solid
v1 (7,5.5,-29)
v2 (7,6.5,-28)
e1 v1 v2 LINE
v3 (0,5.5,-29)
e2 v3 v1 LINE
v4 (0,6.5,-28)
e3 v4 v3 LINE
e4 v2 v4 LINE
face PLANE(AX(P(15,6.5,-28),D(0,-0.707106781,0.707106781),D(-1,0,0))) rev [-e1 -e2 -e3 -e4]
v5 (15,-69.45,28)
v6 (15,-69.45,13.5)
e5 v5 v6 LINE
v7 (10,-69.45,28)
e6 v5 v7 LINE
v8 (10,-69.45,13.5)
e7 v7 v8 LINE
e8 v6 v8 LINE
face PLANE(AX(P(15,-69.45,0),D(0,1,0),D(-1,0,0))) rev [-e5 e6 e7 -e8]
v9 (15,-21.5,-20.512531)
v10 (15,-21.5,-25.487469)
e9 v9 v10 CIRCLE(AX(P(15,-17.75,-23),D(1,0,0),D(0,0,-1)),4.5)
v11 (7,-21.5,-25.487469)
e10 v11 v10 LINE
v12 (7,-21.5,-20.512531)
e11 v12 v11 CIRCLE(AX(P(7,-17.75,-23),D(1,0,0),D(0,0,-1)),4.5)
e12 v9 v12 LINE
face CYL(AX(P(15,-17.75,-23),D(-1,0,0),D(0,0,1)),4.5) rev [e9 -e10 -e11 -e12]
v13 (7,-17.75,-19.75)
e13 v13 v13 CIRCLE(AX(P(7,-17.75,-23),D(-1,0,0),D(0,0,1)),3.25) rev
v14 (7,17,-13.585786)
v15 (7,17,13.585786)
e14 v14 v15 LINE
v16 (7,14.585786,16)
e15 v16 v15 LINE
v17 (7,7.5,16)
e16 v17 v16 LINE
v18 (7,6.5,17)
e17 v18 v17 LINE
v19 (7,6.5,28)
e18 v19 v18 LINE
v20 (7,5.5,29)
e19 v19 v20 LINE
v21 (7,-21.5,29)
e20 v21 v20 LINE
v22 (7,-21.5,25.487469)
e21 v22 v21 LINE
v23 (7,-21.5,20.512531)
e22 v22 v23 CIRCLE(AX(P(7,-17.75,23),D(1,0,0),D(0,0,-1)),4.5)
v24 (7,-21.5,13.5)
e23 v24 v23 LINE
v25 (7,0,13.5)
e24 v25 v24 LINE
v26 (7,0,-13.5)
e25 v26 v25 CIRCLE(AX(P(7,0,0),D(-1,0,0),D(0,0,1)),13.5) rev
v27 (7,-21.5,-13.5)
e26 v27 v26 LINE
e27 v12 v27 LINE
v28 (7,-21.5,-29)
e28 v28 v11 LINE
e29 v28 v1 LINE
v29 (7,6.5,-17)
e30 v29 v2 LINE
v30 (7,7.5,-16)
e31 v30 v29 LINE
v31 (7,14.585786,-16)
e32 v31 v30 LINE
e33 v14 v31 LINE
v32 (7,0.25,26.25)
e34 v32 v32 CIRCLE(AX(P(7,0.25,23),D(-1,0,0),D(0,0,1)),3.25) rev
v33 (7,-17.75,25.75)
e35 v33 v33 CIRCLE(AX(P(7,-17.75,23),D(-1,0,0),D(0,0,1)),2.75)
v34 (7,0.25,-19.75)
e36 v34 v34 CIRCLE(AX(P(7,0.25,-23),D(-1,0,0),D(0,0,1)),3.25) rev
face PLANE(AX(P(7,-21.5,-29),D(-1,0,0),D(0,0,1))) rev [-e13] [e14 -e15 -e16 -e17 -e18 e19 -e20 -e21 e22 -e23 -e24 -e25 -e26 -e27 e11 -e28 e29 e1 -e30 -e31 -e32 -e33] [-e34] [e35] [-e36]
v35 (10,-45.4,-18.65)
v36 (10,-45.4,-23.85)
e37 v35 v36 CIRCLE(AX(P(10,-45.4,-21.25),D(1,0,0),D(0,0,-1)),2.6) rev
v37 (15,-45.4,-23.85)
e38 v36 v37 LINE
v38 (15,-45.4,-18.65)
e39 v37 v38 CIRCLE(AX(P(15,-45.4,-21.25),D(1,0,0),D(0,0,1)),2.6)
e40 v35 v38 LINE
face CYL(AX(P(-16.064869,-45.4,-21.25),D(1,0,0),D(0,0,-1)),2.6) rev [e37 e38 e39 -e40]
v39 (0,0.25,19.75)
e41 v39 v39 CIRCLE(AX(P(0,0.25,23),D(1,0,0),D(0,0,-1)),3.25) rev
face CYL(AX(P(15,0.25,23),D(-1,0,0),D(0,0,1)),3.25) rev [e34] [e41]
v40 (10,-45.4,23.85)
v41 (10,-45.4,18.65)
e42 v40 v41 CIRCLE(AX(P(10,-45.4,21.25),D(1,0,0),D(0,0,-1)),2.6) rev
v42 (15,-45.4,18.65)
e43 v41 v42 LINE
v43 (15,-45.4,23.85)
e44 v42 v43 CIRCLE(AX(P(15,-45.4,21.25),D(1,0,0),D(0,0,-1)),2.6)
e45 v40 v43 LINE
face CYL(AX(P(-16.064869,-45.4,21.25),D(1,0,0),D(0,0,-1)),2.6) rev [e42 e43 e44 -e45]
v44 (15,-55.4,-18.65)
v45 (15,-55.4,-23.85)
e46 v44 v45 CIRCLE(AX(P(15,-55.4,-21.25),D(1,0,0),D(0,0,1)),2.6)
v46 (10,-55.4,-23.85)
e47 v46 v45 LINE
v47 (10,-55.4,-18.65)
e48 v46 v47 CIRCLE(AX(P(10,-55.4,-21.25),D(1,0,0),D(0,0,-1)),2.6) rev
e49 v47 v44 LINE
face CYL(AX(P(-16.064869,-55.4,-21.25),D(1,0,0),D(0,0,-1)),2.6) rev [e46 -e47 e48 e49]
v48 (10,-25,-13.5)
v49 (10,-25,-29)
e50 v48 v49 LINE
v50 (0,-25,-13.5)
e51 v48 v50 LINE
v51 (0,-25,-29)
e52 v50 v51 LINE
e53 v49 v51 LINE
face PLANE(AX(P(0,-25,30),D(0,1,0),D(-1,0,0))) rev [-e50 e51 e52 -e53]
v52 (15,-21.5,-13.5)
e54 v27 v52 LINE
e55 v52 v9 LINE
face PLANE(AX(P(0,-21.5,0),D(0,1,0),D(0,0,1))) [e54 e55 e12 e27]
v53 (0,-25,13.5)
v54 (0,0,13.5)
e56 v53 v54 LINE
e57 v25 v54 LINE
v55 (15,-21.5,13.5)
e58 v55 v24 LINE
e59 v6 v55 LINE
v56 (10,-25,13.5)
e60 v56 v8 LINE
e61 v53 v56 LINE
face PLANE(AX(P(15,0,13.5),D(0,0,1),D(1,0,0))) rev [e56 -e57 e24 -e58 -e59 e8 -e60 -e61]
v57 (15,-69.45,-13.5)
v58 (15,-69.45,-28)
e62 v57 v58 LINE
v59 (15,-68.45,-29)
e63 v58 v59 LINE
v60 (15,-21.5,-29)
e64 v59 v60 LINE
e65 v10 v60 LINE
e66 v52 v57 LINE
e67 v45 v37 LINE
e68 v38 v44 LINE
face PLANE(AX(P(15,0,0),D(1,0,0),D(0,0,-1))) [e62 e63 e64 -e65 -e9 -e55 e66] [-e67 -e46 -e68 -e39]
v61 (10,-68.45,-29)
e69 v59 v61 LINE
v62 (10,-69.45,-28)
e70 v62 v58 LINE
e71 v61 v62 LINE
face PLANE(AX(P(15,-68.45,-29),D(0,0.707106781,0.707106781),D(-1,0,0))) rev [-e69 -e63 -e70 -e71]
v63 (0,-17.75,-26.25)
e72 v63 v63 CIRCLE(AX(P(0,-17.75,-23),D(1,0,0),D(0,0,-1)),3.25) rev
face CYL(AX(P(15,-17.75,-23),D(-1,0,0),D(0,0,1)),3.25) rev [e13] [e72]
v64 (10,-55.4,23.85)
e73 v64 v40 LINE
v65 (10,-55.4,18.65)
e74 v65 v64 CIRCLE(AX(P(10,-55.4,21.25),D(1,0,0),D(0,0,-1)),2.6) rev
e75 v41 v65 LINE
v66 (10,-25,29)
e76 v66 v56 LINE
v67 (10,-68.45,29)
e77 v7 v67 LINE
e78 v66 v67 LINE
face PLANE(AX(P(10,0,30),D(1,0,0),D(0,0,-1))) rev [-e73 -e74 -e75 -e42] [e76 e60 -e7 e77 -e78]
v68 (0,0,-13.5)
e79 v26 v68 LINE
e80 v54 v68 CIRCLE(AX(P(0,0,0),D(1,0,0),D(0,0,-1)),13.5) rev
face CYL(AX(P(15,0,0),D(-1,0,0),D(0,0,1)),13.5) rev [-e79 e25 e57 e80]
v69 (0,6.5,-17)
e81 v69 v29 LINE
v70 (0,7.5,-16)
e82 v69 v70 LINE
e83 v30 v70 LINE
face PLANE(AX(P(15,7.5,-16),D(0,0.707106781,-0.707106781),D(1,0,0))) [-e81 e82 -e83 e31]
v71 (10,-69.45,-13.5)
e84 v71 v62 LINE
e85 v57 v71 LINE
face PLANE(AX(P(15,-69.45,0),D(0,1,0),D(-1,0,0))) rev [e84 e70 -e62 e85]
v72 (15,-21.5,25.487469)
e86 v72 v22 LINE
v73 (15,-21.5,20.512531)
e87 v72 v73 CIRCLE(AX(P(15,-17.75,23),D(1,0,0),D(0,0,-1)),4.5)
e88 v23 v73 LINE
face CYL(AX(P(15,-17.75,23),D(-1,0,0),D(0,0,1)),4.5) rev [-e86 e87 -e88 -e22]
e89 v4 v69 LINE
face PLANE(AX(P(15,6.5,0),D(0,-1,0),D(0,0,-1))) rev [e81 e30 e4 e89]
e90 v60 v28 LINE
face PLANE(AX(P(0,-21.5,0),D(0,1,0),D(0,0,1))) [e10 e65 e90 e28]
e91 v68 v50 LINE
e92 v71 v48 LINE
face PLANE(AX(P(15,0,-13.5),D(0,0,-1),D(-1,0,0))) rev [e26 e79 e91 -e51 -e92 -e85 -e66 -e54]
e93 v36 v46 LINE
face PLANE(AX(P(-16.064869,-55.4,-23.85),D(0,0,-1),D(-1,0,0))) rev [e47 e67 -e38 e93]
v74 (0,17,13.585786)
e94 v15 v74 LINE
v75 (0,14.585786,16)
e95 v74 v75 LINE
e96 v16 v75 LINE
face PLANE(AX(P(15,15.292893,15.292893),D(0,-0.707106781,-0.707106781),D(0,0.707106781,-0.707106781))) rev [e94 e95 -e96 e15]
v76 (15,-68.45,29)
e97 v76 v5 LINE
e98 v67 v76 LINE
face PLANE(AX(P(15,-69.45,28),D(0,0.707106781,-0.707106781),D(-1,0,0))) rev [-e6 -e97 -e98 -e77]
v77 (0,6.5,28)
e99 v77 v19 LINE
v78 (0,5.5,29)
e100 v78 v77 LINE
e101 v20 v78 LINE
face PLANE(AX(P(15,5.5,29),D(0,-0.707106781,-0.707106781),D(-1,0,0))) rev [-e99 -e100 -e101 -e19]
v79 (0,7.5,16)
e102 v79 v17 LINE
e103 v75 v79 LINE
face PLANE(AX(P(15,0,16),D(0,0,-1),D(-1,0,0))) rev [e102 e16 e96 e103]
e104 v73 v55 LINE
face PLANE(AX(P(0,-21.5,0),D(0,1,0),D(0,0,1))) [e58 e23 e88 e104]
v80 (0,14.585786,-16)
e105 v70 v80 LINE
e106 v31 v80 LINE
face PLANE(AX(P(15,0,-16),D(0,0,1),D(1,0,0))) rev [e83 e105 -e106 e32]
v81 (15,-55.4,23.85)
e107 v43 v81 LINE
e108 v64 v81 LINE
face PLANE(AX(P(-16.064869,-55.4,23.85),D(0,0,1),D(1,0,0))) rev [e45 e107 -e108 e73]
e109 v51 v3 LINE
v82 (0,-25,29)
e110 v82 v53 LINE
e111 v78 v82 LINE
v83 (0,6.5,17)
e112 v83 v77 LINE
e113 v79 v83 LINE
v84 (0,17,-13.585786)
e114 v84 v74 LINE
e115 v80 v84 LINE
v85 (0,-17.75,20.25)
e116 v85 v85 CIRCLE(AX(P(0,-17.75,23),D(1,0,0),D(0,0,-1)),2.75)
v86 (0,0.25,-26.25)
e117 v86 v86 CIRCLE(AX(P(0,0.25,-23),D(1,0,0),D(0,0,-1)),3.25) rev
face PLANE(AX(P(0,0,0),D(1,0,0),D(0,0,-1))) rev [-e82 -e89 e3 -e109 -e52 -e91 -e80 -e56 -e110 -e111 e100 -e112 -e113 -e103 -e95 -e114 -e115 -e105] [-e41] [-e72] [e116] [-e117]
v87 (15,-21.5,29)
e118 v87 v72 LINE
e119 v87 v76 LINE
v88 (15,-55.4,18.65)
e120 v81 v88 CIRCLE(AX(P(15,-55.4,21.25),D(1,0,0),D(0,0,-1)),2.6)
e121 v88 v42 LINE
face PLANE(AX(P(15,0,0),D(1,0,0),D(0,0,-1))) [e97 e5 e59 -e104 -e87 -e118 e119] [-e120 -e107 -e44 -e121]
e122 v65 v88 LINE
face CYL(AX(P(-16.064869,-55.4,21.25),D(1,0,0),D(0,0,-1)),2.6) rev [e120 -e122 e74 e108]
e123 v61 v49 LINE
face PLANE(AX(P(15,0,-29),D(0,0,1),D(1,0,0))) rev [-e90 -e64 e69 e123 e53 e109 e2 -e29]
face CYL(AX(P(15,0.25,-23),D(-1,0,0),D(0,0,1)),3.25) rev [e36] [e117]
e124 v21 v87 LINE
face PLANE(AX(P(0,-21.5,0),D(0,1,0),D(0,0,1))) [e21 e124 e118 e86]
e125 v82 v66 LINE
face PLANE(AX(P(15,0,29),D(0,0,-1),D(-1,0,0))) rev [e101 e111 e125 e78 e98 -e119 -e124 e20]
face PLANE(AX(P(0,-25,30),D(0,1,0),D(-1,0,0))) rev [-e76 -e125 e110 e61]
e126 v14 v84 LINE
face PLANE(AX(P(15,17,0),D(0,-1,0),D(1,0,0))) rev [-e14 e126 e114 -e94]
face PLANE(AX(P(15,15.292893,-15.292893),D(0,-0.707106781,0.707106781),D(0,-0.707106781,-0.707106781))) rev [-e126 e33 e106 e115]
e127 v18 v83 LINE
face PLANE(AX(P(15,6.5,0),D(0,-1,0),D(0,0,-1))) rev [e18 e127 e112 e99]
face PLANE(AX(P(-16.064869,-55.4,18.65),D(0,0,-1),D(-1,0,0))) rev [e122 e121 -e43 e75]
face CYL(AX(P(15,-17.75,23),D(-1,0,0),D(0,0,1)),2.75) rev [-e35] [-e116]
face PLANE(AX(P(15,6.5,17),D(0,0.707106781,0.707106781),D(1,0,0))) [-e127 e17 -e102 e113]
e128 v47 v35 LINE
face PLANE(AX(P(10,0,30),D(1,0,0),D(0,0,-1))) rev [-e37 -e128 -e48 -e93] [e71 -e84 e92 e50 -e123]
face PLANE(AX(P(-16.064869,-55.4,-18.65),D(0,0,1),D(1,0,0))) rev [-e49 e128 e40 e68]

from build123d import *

# Parameters (mm, degrees)
SKETCH1_W                               = 43
SKETCH1_H                               = 60
BOSS_EXTRUDE1_DEPTH                     = 20
SKETCH2_W                               = 13
SKETCH2_H                               = 10.5
CUT_EXTRUDE1_DEPTH                      = 44.874821937
SKETCH3_W                               = 13
SKETCH3_H                               = 10.5
CUT_EXTRUDE2_DEPTH                      = 44.874821937
F_5_5_5_5_DIAMETER_HOLE1_D              = 5.5
M22_CLEARANCE_HOLE1_D                   = 26
F_5_5_5_5_DIAMETER_HOLE2_D              = 5.5
F_5_5_5_5_DIAMETER_HOLE2_DEPTH          = 30
CBORE_FOR_M5_HEX_HEAD_BOLT1_D           = 5.5
CBORE_FOR_M5_HEX_HEAD_BOLT1_DEPTH       = 39.75
CBORE_FOR_M5_HEX_HEAD_BOLT1_CBORE_D     = 10.8
CBORE_FOR_M5_HEX_HEAD_BOLT1_CBORE_DEPTH = 3
CHAMFER1_SIZE                           = 3
CHAMFER2_SIZE                           = 0.5
CHAMFER3_SIZE                           = 1
BOSS_EXTRUDE2_OUTLINE_R                 = 2.75
BOSS_EXTRUDE2_OUTLINE_R_2               = 3.25
BOSS_EXTRUDE2_OUTLINE_R_3               = 13.5
BOSS_EXTRUDE2_DEPTH                     = 15
CUT_EXTRUDE4_DEPTH                      = 15
CHAMFER4_SIZE                           = 1
CUT_EXTRUDE5_DEPTH                      = 94.296851501
CUT_EXTRUDE5_DEPTH_BACK                 = 94.296851501
SKETCH17_W                              = 10
SKETCH17_H                              = 43.45
SKETCH17_H_2                            = 1
CUT_EXTRUDE6_DEPTH                      = 77.741791092
SKETCH20_R                              = 13.5
SKETCH20_W                              = 27
SKETCH20_H                              = 44.45
CUT_EXTRUDE7_DEPTH                      = 77.741791092
SKETCH22_W                              = 8
SKETCH22_H                              = 58
CUT_EXTRUDE8_DEPTH                      = 38.5
SKETCH23_R                              = 4.5
CUT_EXTRUDE9_DEPTH                      = 76.68555014


# Read off the part's stored shape, not the designer's step: Boss-Extrude2
with BuildPart() as part:
    # Sketch1 → Boss-Extrude1 (new body)
    with BuildSketch(Plane(origin=(-20, 0, 0), x_dir=(0, -1, 0), z_dir=(-1, 0, 0))):
        with Locations((3.5, 0)):
            Rectangle(SKETCH1_W, SKETCH1_H)
    extrude(amount=-BOSS_EXTRUDE1_DEPTH)

    # Sketch2 → Cut-Extrude1 (cut, through all)
    with BuildSketch(Plane(origin=(0, 0, 0), x_dir=(0, 0, -1), z_dir=(1, 0, 0))):
        with Locations((-23.5, 12.75)):
            Rectangle(SKETCH2_W, SKETCH2_H)
    extrude(amount=-CUT_EXTRUDE1_DEPTH, mode=Mode.SUBTRACT)

    # Sketch3 → Cut-Extrude2 (cut, through all)
    with BuildSketch(Plane(origin=(0, 0, 0), x_dir=(0, 0, -1), z_dir=(1, 0, 0))):
        with Locations((23.5, 12.75)):
            Rectangle(SKETCH3_W, SKETCH3_H)
    extrude(amount=-CUT_EXTRUDE2_DEPTH, mode=Mode.SUBTRACT)

    # Ø5.5 (5.5) Diameter Hole1 (through all)
    with Locations(Plane.ZY.offset(20)):
        with Locations((23, 0.25), (-23, -17.75), (-23, 0.25)):
            Hole(F_5_5_5_5_DIAMETER_HOLE1_D / 2)

    # M22 Clearance Hole1 (through all)
    with Locations(Plane(origin=(0, 0, 0), x_dir=(0, 0, -1), z_dir=(1, 0, 0))):
        with Locations((0, 0)):
            Hole(M22_CLEARANCE_HOLE1_D / 2)

    # Ø5.5 (5.5) Diameter Hole2
    with Locations(Plane(origin=(0, 0, 0), x_dir=(0, 0, -1), z_dir=(1, 0, 0))):
        with Locations((-23, -17.75)):
            Hole(F_5_5_5_5_DIAMETER_HOLE2_D / 2, depth=F_5_5_5_5_DIAMETER_HOLE2_DEPTH)

    # CBORE for M5 Hex Head Bolt1
    with Locations(Plane(origin=(0, 7.5, 0), x_dir=(1, 0, 0), z_dir=(0, 1, 0))):
        with Locations((-10, 23), (-10, -23)):
            CounterBoreHole(CBORE_FOR_M5_HEX_HEAD_BOLT1_D / 2, CBORE_FOR_M5_HEX_HEAD_BOLT1_CBORE_D / 2, CBORE_FOR_M5_HEX_HEAD_BOLT1_CBORE_DEPTH, depth=CBORE_FOR_M5_HEX_HEAD_BOLT1_DEPTH)

    # Chamfer1
    chamfer1_edges = [part.edges().sort_by_distance(p)[0] for p in [
        (-10, 18, 17),
        (-10, 18, -17),
    ]]
    chamfer(chamfer1_edges, length=CHAMFER1_SIZE)

    # Chamfer2
    chamfer2_edges = [part.edges().sort_by_distance(p)[0] for p in [
        (-7.25, -25, -23),
        (-20, 0.25, -20.25),
        (0, 0.25, -20.25),
        (-20, -17.75, -20.25),
        (0, -17.75, -20.25),
        (-20, 0.25, 25.75),
        (0, 0.25, 25.75),
        (0, 0, -13),
        (-20, 0, -13),
        (-20, -17.75, 20.25),
        (0, -17.75, 20.25),
        (-7.25, -25, 23),
    ]]
    chamfer(chamfer2_edges, length=CHAMFER2_SIZE)

    # Chamfer3
    chamfer3_edges = [part.edges().sort_by_distance(p)[0] for p in [
        (0, 11.25, -17),
        (-20, 11.25, -17),
        (0, 18, 0),
        (0, 16.5, 15.5),
        (0, 16.5, -15.5),
        (-20, 18, 0),
        (-20, 16.5, 15.5),
        (-20, 16.5, -15.5),
        (-10, 7.5, 30),
        (-20, 11.25, 17),
        (-20, 7.5, 23.5),
        (0, 7.5, 23.5),
        (0, 11.25, 17),
        (-20, -8.75, -30),
        (0, -8.75, -30),
        (-20, 7.5, -23.5),
        (-10, 7.5, -30),
        (0, 7.5, -23.5),
        (0, -25, 0),
        (-20, -8.75, 30),
        (-20, -25, 0),
        (-10, -25, -30),
        (-10, -25, 30),
        (0, -8.75, 30),
    ]]
    chamfer(chamfer3_edges, length=CHAMFER3_SIZE)

    # Boss-Extrude2 outline → Boss-Extrude2 (add)
    with BuildSketch(Plane(origin=(0, 0, 0), x_dir=(0, 0, -1), z_dir=(1, 0, 0))):
        Polygon((-29, 6.5), (-29, -69.45), (29, -69.45), (29, 6.5), (16, 6.5), (16, 14.585786438), (13.585786438, 17), (-13.585786438, 17), (-16, 14.585786438), (-16, 6.5), align=None)
        with Locations((-23, -17.75)):
            Circle(BOSS_EXTRUDE2_OUTLINE_R, mode=Mode.SUBTRACT)
        with Locations((-23, 0.25)):
            Circle(BOSS_EXTRUDE2_OUTLINE_R_2, mode=Mode.SUBTRACT)
        with Locations((23, -17.75)):
            Circle(BOSS_EXTRUDE2_OUTLINE_R_2, mode=Mode.SUBTRACT)
        Circle(BOSS_EXTRUDE2_OUTLINE_R_3, mode=Mode.SUBTRACT)
        with Locations((23, 0.25)):
            Circle(BOSS_EXTRUDE2_OUTLINE_R_2, mode=Mode.SUBTRACT)
    extrude(amount=BOSS_EXTRUDE2_DEPTH)

    # Sketch16 → Cut-Extrude4 (cut)
    with BuildSketch(Plane(origin=(15, 0, 0), x_dir=(0, 0, -1), z_dir=(1, 0, 0))):
        with BuildLine():
            Line((-23.85, -55.4), (-23.85, -45.4))
            ThreePointArc((-23.85, -45.4), (-21.25, -42.8), (-18.65, -45.4))
            Line((-18.65, -45.4), (-18.65, -55.4))
            ThreePointArc((-18.65, -55.4), (-21.25, -58), (-23.85, -55.4))
        make_face()
        with BuildLine():
            Line((23.85, -55.4), (23.85, -45.4))
            ThreePointArc((23.85, -45.4), (21.25, -42.8), (18.65, -45.4))
            Line((18.65, -45.4), (18.65, -55.4))
            ThreePointArc((18.65, -55.4), (21.25, -58), (23.85, -55.4))
        make_face()
    extrude(amount=-CUT_EXTRUDE4_DEPTH, mode=Mode.SUBTRACT)

    # Chamfer4
    # the kernel refuses this chamfer: 1 mm, written as the material it adds along each edge
    with BuildSketch(Plane(origin=(-2.571682988, 6.5, -16), x_dir=(0, 0.9996219169112968, 0.027495876610585623), z_dir=(1, 0, 0))) as chamfer4_piece_1:
        Polygon((CHAMFER4_SIZE * 0.999621916911, -CHAMFER4_SIZE * 0.0274958766106), (-CHAMFER4_SIZE * 0.0274958766106, -CHAMFER4_SIZE * 0.999621916911), (0, 0), align=None)
    extrude(amount=17.571682988)
    with BuildSketch(Plane(origin=(-2.571682988, 6.5, 16), x_dir=(0, 0.9996219169112968, -0.027495876610585623), z_dir=(1, 0, 0))) as chamfer4_piece_2:
        Polygon((CHAMFER4_SIZE * 0.999621916911, CHAMFER4_SIZE * 0.0274958766106), (-CHAMFER4_SIZE * 0.0274958766106, CHAMFER4_SIZE * 0.999621916911), (0, 0), align=None)
    extrude(amount=17.571682988)
    # the kernel refuses this chamfer: 1 mm, written as the material it takes off along each edge
    with BuildSketch(Plane(origin=(-2.571682988, 6.5, 29), x_dir=(0, -0.9996219169112968, 0.027495876610585623), z_dir=(1, 0, 0))) as chamfer4_2_piece_1_section:
        Polygon((CHAMFER4_SIZE * 0.999621916911, CHAMFER4_SIZE * 0.0274958766106), (-CHAMFER4_SIZE * 0.0274958766106, CHAMFER4_SIZE * 0.999621916911), (0, 0), align=None)
    chamfer4_2_piece_1 = extrude(amount=20.143365976, mode=Mode.PRIVATE)
    chamfer4_2_piece_1 = split(chamfer4_2_piece_1, bisect_by=Plane(origin=(0.509665213, 6.397220748, 28.490334787), z_dir=(-0.7071067811865551, 0, -0.7071067811865401)), keep=Keep.TOP, mode=Mode.PRIVATE)
    chamfer4_2_piece_1 = split(chamfer4_2_piece_1, bisect_by=Plane(origin=(0.238407906, 6.261592094, 28.354706133), z_dir=(0.7071067811865476, 0.7071067811865475, -8.40952718991379e-15)), keep=Keep.TOP, mode=Mode.PRIVATE)
    add(chamfer4_2_piece_1, mode=Mode.SUBTRACT)
    with BuildSketch(Plane(origin=(-2.571682988, 6.5, 29), x_dir=(0, -0.9996219169112968, 0.027495876610585623), z_dir=(1, 0, 0))) as chamfer4_2_piece_2_section:
        Polygon((CHAMFER4_SIZE * 0.999621916911, CHAMFER4_SIZE * 0.0274958766106), (-CHAMFER4_SIZE * 0.0274958766106, CHAMFER4_SIZE * 0.999621916911), (0, 0), align=None)
    chamfer4_2_piece_2 = extrude(amount=20.143365976, mode=Mode.PRIVATE)
    chamfer4_2_piece_2 = split(chamfer4_2_piece_2, bisect_by=Plane(origin=(0.238407906, 5.854706133, 28.761592094), z_dir=(0.7071067811865551, 0, 0.7071067811865401)), keep=Keep.TOP, mode=Mode.PRIVATE)
    chamfer4_2_piece_2 = split(chamfer4_2_piece_2, bisect_by=Plane(origin=(0.509665213, 5.990334787, 28.897220748), z_dir=(-0.7071067811865476, -0.7071067811865475, 8.40952718991379e-15)), keep=Keep.TOP, mode=Mode.PRIVATE)
    add(chamfer4_2_piece_2, mode=Mode.SUBTRACT)
    with BuildSketch(Plane(origin=(-2.571682988, 6.5, 29), x_dir=(0, -0.9996219169112968, 0.027495876610585623), z_dir=(1, 0, 0))) as chamfer4_2_piece_3_section:
        Polygon((CHAMFER4_SIZE * 0.999621916911, CHAMFER4_SIZE * 0.0274958766106), (-CHAMFER4_SIZE * 0.0274958766106, CHAMFER4_SIZE * 0.999621916911), (0, 0), align=None)
    chamfer4_2_piece_3 = extrude(amount=20.143365976, mode=Mode.PRIVATE)
    chamfer4_2_piece_3 = split(chamfer4_2_piece_3, bisect_by=Plane(origin=(4.683816691, 6.171538214, 24.316183309), z_dir=(0.7071067811865551, 0, 0.7071067811865401)), keep=Keep.TOP, mode=Mode.PRIVATE)
    chamfer4_2_piece_3 = split(chamfer4_2_piece_3, bisect_by=Plane(origin=(4.683816691, 1.816183309, 28.671538214), z_dir=(0.7071067811865476, 0.7071067811865475, -8.40952718991379e-15)), keep=Keep.TOP, mode=Mode.PRIVATE)
    add(chamfer4_2_piece_3, mode=Mode.SUBTRACT)
    with BuildSketch(Plane(origin=(-2.571682988, -69.45, 29), x_dir=(0, 0.9996219169112968, 0.02749587661058574), z_dir=(1, 0, 0))) as chamfer4_2_piece_4:
        Polygon((CHAMFER4_SIZE * 0.999621916911, -CHAMFER4_SIZE * 0.0274958766106), (-CHAMFER4_SIZE * 0.0274958766106, -CHAMFER4_SIZE * 0.999621916911), (0, 0), align=None)
    extrude(amount=20.143365976, mode=Mode.SUBTRACT)
    with BuildSketch(Plane(origin=(-2.571682988, -69.45, -29), x_dir=(0, 0.9996219169112968, -0.02749587661058574), z_dir=(1, 0, 0))) as chamfer4_2_piece_5:
        Polygon((CHAMFER4_SIZE * 0.999621916911, CHAMFER4_SIZE * 0.0274958766106), (-CHAMFER4_SIZE * 0.0274958766106, CHAMFER4_SIZE * 0.999621916911), (0, 0), align=None)
    extrude(amount=20.143365976, mode=Mode.SUBTRACT)
    with BuildSketch(Plane(origin=(-2.571682988, 6.5, -29), x_dir=(1.2022868737477314e-14, 0.02749587661058651, 0.9996219169112968), z_dir=(1, 0, 0))) as chamfer4_2_piece_6_section:
        Polygon((CHAMFER4_SIZE * 0.999621916911, CHAMFER4_SIZE * 0.0274958766106), (-CHAMFER4_SIZE * 0.0274958766106, CHAMFER4_SIZE * 0.999621916911), (0, 0), align=None)
    chamfer4_2_piece_6 = extrude(amount=20.143365976, mode=Mode.PRIVATE)
    chamfer4_2_piece_6 = split(chamfer4_2_piece_6, bisect_by=Plane(origin=(0.509665213, 5.990334787, -28.897220748), z_dir=(-0.7071067811865476, -0.7071067811865475, 8.60574949101178e-15)), keep=Keep.TOP, mode=Mode.PRIVATE)
    chamfer4_2_piece_6 = split(chamfer4_2_piece_6, bisect_by=Plane(origin=(0.238407906, 5.854706133, -28.761592094), z_dir=(0.707106781186539, 0, -0.7071067811865561)), keep=Keep.TOP, mode=Mode.PRIVATE)
    add(chamfer4_2_piece_6, mode=Mode.SUBTRACT)
    with BuildSketch(Plane(origin=(-2.571682988, 6.5, -29), x_dir=(1.2022868737477314e-14, 0.02749587661058651, 0.9996219169112968), z_dir=(1, 0, 0))) as chamfer4_2_piece_7_section:
        Polygon((CHAMFER4_SIZE * 0.999621916911, CHAMFER4_SIZE * 0.0274958766106), (-CHAMFER4_SIZE * 0.0274958766106, CHAMFER4_SIZE * 0.999621916911), (0, 0), align=None)
    chamfer4_2_piece_7 = extrude(amount=20.143365976, mode=Mode.PRIVATE)
    chamfer4_2_piece_7 = split(chamfer4_2_piece_7, bisect_by=Plane(origin=(0.238407906, 6.261592094, -28.354706133), z_dir=(0.7071067811865476, 0.7071067811865475, -8.60574949101178e-15)), keep=Keep.TOP, mode=Mode.PRIVATE)
    chamfer4_2_piece_7 = split(chamfer4_2_piece_7, bisect_by=Plane(origin=(0.509665213, 6.397220748, -28.490334787), z_dir=(-0.707106781186539, 0, 0.7071067811865561)), keep=Keep.TOP, mode=Mode.PRIVATE)
    add(chamfer4_2_piece_7, mode=Mode.SUBTRACT)
    with BuildSketch(Plane(origin=(-2.571682988, 6.5, -29), x_dir=(1.2022868737477314e-14, 0.02749587661058651, 0.9996219169112968), z_dir=(1, 0, 0))) as chamfer4_2_piece_8_section:
        Polygon((CHAMFER4_SIZE * 0.999621916911, CHAMFER4_SIZE * 0.0274958766106), (-CHAMFER4_SIZE * 0.0274958766106, CHAMFER4_SIZE * 0.999621916911), (0, 0), align=None)
    chamfer4_2_piece_8 = extrude(amount=20.143365976, mode=Mode.PRIVATE)
    chamfer4_2_piece_8 = split(chamfer4_2_piece_8, bisect_by=Plane(origin=(4.683816691, 1.816183309, -28.671538214), z_dir=(0.7071067811865476, 0.7071067811865475, -8.60574949101178e-15)), keep=Keep.TOP, mode=Mode.PRIVATE)
    chamfer4_2_piece_8 = split(chamfer4_2_piece_8, bisect_by=Plane(origin=(4.683816691, 6.171538214, -24.316183309), z_dir=(0.707106781186539, 0, -0.7071067811865561)), keep=Keep.TOP, mode=Mode.PRIVATE)
    add(chamfer4_2_piece_8, mode=Mode.SUBTRACT)

    # Sketch17 → Cut-Extrude5 (cut, two sides: drawn at the far end of the back side and taken through both)
    with BuildSketch(Plane(origin=(0, 0, -29), x_dir=(-1, 0, 0), z_dir=(0, 0, -1)).offset(-CUT_EXTRUDE5_DEPTH_BACK)):
        Polygon((20, -25), (20, 18), (0, 18), (0, 5.5), (0, -24), (0, -25), align=None)
        with Locations((-5, -46.725)):
            Rectangle(SKETCH17_W, SKETCH17_H)
        with Locations((-5, -68.95)):
            Rectangle(SKETCH17_W, SKETCH17_H_2)
    extrude(amount=CUT_EXTRUDE5_DEPTH + CUT_EXTRUDE5_DEPTH_BACK, mode=Mode.SUBTRACT)

    # Sketch18 → Cut-Extrude6 (cut, through all)
    with BuildSketch(Plane(origin=(15, 0, 0), x_dir=(0, 0, -1), z_dir=(1, 0, 0))):
        Polygon((-29, 5.5), (-29, 6.5), (-28, 6.5), align=None)
        Polygon((28, 6.5), (29, 6.5), (29, 5.5), align=None)
    extrude(amount=-CUT_EXTRUDE6_DEPTH, mode=Mode.SUBTRACT)

    # Sketch20 → Cut-Extrude7 (cut, through all)
    with BuildSketch(Plane.ZY):
        Circle(SKETCH20_R)
        with BuildLine():
            ThreePointArc((13.5, 0), (0, -13.5), (-13.5, 0))
            Line((-13.5, 0), (-13.5, -25))
            Line((-13.5, -25), (13.5, -25))
            Line((13.5, -25), (13.5, 0))
        make_face()
        with Locations((0, -47.225)):
            Rectangle(SKETCH20_W, SKETCH20_H)
    extrude(amount=-CUT_EXTRUDE7_DEPTH, mode=Mode.SUBTRACT)

    # Sketch22 → Cut-Extrude8 (cut)
    with BuildSketch(Plane(origin=(0, 17, 0), x_dir=(1, 0, 0), z_dir=(0, 1, 0))):
        with Locations((11, 0)):
            Rectangle(SKETCH22_W, SKETCH22_H)
    extrude(amount=-CUT_EXTRUDE8_DEPTH, mode=Mode.SUBTRACT)

    # Sketch23 → Cut-Extrude9 (cut, through all)
    with BuildSketch(Plane(origin=(7, 0, 0), x_dir=(0, 0, -1), z_dir=(1, 0, 0))):
        with Locations((-23, -17.75)):
            Circle(SKETCH23_R)
        with Locations((23, -17.75)):
            Circle(SKETCH23_R)
    extrude(amount=CUT_EXTRUDE9_DEPTH, mode=Mode.SUBTRACT)


solid = part.part
